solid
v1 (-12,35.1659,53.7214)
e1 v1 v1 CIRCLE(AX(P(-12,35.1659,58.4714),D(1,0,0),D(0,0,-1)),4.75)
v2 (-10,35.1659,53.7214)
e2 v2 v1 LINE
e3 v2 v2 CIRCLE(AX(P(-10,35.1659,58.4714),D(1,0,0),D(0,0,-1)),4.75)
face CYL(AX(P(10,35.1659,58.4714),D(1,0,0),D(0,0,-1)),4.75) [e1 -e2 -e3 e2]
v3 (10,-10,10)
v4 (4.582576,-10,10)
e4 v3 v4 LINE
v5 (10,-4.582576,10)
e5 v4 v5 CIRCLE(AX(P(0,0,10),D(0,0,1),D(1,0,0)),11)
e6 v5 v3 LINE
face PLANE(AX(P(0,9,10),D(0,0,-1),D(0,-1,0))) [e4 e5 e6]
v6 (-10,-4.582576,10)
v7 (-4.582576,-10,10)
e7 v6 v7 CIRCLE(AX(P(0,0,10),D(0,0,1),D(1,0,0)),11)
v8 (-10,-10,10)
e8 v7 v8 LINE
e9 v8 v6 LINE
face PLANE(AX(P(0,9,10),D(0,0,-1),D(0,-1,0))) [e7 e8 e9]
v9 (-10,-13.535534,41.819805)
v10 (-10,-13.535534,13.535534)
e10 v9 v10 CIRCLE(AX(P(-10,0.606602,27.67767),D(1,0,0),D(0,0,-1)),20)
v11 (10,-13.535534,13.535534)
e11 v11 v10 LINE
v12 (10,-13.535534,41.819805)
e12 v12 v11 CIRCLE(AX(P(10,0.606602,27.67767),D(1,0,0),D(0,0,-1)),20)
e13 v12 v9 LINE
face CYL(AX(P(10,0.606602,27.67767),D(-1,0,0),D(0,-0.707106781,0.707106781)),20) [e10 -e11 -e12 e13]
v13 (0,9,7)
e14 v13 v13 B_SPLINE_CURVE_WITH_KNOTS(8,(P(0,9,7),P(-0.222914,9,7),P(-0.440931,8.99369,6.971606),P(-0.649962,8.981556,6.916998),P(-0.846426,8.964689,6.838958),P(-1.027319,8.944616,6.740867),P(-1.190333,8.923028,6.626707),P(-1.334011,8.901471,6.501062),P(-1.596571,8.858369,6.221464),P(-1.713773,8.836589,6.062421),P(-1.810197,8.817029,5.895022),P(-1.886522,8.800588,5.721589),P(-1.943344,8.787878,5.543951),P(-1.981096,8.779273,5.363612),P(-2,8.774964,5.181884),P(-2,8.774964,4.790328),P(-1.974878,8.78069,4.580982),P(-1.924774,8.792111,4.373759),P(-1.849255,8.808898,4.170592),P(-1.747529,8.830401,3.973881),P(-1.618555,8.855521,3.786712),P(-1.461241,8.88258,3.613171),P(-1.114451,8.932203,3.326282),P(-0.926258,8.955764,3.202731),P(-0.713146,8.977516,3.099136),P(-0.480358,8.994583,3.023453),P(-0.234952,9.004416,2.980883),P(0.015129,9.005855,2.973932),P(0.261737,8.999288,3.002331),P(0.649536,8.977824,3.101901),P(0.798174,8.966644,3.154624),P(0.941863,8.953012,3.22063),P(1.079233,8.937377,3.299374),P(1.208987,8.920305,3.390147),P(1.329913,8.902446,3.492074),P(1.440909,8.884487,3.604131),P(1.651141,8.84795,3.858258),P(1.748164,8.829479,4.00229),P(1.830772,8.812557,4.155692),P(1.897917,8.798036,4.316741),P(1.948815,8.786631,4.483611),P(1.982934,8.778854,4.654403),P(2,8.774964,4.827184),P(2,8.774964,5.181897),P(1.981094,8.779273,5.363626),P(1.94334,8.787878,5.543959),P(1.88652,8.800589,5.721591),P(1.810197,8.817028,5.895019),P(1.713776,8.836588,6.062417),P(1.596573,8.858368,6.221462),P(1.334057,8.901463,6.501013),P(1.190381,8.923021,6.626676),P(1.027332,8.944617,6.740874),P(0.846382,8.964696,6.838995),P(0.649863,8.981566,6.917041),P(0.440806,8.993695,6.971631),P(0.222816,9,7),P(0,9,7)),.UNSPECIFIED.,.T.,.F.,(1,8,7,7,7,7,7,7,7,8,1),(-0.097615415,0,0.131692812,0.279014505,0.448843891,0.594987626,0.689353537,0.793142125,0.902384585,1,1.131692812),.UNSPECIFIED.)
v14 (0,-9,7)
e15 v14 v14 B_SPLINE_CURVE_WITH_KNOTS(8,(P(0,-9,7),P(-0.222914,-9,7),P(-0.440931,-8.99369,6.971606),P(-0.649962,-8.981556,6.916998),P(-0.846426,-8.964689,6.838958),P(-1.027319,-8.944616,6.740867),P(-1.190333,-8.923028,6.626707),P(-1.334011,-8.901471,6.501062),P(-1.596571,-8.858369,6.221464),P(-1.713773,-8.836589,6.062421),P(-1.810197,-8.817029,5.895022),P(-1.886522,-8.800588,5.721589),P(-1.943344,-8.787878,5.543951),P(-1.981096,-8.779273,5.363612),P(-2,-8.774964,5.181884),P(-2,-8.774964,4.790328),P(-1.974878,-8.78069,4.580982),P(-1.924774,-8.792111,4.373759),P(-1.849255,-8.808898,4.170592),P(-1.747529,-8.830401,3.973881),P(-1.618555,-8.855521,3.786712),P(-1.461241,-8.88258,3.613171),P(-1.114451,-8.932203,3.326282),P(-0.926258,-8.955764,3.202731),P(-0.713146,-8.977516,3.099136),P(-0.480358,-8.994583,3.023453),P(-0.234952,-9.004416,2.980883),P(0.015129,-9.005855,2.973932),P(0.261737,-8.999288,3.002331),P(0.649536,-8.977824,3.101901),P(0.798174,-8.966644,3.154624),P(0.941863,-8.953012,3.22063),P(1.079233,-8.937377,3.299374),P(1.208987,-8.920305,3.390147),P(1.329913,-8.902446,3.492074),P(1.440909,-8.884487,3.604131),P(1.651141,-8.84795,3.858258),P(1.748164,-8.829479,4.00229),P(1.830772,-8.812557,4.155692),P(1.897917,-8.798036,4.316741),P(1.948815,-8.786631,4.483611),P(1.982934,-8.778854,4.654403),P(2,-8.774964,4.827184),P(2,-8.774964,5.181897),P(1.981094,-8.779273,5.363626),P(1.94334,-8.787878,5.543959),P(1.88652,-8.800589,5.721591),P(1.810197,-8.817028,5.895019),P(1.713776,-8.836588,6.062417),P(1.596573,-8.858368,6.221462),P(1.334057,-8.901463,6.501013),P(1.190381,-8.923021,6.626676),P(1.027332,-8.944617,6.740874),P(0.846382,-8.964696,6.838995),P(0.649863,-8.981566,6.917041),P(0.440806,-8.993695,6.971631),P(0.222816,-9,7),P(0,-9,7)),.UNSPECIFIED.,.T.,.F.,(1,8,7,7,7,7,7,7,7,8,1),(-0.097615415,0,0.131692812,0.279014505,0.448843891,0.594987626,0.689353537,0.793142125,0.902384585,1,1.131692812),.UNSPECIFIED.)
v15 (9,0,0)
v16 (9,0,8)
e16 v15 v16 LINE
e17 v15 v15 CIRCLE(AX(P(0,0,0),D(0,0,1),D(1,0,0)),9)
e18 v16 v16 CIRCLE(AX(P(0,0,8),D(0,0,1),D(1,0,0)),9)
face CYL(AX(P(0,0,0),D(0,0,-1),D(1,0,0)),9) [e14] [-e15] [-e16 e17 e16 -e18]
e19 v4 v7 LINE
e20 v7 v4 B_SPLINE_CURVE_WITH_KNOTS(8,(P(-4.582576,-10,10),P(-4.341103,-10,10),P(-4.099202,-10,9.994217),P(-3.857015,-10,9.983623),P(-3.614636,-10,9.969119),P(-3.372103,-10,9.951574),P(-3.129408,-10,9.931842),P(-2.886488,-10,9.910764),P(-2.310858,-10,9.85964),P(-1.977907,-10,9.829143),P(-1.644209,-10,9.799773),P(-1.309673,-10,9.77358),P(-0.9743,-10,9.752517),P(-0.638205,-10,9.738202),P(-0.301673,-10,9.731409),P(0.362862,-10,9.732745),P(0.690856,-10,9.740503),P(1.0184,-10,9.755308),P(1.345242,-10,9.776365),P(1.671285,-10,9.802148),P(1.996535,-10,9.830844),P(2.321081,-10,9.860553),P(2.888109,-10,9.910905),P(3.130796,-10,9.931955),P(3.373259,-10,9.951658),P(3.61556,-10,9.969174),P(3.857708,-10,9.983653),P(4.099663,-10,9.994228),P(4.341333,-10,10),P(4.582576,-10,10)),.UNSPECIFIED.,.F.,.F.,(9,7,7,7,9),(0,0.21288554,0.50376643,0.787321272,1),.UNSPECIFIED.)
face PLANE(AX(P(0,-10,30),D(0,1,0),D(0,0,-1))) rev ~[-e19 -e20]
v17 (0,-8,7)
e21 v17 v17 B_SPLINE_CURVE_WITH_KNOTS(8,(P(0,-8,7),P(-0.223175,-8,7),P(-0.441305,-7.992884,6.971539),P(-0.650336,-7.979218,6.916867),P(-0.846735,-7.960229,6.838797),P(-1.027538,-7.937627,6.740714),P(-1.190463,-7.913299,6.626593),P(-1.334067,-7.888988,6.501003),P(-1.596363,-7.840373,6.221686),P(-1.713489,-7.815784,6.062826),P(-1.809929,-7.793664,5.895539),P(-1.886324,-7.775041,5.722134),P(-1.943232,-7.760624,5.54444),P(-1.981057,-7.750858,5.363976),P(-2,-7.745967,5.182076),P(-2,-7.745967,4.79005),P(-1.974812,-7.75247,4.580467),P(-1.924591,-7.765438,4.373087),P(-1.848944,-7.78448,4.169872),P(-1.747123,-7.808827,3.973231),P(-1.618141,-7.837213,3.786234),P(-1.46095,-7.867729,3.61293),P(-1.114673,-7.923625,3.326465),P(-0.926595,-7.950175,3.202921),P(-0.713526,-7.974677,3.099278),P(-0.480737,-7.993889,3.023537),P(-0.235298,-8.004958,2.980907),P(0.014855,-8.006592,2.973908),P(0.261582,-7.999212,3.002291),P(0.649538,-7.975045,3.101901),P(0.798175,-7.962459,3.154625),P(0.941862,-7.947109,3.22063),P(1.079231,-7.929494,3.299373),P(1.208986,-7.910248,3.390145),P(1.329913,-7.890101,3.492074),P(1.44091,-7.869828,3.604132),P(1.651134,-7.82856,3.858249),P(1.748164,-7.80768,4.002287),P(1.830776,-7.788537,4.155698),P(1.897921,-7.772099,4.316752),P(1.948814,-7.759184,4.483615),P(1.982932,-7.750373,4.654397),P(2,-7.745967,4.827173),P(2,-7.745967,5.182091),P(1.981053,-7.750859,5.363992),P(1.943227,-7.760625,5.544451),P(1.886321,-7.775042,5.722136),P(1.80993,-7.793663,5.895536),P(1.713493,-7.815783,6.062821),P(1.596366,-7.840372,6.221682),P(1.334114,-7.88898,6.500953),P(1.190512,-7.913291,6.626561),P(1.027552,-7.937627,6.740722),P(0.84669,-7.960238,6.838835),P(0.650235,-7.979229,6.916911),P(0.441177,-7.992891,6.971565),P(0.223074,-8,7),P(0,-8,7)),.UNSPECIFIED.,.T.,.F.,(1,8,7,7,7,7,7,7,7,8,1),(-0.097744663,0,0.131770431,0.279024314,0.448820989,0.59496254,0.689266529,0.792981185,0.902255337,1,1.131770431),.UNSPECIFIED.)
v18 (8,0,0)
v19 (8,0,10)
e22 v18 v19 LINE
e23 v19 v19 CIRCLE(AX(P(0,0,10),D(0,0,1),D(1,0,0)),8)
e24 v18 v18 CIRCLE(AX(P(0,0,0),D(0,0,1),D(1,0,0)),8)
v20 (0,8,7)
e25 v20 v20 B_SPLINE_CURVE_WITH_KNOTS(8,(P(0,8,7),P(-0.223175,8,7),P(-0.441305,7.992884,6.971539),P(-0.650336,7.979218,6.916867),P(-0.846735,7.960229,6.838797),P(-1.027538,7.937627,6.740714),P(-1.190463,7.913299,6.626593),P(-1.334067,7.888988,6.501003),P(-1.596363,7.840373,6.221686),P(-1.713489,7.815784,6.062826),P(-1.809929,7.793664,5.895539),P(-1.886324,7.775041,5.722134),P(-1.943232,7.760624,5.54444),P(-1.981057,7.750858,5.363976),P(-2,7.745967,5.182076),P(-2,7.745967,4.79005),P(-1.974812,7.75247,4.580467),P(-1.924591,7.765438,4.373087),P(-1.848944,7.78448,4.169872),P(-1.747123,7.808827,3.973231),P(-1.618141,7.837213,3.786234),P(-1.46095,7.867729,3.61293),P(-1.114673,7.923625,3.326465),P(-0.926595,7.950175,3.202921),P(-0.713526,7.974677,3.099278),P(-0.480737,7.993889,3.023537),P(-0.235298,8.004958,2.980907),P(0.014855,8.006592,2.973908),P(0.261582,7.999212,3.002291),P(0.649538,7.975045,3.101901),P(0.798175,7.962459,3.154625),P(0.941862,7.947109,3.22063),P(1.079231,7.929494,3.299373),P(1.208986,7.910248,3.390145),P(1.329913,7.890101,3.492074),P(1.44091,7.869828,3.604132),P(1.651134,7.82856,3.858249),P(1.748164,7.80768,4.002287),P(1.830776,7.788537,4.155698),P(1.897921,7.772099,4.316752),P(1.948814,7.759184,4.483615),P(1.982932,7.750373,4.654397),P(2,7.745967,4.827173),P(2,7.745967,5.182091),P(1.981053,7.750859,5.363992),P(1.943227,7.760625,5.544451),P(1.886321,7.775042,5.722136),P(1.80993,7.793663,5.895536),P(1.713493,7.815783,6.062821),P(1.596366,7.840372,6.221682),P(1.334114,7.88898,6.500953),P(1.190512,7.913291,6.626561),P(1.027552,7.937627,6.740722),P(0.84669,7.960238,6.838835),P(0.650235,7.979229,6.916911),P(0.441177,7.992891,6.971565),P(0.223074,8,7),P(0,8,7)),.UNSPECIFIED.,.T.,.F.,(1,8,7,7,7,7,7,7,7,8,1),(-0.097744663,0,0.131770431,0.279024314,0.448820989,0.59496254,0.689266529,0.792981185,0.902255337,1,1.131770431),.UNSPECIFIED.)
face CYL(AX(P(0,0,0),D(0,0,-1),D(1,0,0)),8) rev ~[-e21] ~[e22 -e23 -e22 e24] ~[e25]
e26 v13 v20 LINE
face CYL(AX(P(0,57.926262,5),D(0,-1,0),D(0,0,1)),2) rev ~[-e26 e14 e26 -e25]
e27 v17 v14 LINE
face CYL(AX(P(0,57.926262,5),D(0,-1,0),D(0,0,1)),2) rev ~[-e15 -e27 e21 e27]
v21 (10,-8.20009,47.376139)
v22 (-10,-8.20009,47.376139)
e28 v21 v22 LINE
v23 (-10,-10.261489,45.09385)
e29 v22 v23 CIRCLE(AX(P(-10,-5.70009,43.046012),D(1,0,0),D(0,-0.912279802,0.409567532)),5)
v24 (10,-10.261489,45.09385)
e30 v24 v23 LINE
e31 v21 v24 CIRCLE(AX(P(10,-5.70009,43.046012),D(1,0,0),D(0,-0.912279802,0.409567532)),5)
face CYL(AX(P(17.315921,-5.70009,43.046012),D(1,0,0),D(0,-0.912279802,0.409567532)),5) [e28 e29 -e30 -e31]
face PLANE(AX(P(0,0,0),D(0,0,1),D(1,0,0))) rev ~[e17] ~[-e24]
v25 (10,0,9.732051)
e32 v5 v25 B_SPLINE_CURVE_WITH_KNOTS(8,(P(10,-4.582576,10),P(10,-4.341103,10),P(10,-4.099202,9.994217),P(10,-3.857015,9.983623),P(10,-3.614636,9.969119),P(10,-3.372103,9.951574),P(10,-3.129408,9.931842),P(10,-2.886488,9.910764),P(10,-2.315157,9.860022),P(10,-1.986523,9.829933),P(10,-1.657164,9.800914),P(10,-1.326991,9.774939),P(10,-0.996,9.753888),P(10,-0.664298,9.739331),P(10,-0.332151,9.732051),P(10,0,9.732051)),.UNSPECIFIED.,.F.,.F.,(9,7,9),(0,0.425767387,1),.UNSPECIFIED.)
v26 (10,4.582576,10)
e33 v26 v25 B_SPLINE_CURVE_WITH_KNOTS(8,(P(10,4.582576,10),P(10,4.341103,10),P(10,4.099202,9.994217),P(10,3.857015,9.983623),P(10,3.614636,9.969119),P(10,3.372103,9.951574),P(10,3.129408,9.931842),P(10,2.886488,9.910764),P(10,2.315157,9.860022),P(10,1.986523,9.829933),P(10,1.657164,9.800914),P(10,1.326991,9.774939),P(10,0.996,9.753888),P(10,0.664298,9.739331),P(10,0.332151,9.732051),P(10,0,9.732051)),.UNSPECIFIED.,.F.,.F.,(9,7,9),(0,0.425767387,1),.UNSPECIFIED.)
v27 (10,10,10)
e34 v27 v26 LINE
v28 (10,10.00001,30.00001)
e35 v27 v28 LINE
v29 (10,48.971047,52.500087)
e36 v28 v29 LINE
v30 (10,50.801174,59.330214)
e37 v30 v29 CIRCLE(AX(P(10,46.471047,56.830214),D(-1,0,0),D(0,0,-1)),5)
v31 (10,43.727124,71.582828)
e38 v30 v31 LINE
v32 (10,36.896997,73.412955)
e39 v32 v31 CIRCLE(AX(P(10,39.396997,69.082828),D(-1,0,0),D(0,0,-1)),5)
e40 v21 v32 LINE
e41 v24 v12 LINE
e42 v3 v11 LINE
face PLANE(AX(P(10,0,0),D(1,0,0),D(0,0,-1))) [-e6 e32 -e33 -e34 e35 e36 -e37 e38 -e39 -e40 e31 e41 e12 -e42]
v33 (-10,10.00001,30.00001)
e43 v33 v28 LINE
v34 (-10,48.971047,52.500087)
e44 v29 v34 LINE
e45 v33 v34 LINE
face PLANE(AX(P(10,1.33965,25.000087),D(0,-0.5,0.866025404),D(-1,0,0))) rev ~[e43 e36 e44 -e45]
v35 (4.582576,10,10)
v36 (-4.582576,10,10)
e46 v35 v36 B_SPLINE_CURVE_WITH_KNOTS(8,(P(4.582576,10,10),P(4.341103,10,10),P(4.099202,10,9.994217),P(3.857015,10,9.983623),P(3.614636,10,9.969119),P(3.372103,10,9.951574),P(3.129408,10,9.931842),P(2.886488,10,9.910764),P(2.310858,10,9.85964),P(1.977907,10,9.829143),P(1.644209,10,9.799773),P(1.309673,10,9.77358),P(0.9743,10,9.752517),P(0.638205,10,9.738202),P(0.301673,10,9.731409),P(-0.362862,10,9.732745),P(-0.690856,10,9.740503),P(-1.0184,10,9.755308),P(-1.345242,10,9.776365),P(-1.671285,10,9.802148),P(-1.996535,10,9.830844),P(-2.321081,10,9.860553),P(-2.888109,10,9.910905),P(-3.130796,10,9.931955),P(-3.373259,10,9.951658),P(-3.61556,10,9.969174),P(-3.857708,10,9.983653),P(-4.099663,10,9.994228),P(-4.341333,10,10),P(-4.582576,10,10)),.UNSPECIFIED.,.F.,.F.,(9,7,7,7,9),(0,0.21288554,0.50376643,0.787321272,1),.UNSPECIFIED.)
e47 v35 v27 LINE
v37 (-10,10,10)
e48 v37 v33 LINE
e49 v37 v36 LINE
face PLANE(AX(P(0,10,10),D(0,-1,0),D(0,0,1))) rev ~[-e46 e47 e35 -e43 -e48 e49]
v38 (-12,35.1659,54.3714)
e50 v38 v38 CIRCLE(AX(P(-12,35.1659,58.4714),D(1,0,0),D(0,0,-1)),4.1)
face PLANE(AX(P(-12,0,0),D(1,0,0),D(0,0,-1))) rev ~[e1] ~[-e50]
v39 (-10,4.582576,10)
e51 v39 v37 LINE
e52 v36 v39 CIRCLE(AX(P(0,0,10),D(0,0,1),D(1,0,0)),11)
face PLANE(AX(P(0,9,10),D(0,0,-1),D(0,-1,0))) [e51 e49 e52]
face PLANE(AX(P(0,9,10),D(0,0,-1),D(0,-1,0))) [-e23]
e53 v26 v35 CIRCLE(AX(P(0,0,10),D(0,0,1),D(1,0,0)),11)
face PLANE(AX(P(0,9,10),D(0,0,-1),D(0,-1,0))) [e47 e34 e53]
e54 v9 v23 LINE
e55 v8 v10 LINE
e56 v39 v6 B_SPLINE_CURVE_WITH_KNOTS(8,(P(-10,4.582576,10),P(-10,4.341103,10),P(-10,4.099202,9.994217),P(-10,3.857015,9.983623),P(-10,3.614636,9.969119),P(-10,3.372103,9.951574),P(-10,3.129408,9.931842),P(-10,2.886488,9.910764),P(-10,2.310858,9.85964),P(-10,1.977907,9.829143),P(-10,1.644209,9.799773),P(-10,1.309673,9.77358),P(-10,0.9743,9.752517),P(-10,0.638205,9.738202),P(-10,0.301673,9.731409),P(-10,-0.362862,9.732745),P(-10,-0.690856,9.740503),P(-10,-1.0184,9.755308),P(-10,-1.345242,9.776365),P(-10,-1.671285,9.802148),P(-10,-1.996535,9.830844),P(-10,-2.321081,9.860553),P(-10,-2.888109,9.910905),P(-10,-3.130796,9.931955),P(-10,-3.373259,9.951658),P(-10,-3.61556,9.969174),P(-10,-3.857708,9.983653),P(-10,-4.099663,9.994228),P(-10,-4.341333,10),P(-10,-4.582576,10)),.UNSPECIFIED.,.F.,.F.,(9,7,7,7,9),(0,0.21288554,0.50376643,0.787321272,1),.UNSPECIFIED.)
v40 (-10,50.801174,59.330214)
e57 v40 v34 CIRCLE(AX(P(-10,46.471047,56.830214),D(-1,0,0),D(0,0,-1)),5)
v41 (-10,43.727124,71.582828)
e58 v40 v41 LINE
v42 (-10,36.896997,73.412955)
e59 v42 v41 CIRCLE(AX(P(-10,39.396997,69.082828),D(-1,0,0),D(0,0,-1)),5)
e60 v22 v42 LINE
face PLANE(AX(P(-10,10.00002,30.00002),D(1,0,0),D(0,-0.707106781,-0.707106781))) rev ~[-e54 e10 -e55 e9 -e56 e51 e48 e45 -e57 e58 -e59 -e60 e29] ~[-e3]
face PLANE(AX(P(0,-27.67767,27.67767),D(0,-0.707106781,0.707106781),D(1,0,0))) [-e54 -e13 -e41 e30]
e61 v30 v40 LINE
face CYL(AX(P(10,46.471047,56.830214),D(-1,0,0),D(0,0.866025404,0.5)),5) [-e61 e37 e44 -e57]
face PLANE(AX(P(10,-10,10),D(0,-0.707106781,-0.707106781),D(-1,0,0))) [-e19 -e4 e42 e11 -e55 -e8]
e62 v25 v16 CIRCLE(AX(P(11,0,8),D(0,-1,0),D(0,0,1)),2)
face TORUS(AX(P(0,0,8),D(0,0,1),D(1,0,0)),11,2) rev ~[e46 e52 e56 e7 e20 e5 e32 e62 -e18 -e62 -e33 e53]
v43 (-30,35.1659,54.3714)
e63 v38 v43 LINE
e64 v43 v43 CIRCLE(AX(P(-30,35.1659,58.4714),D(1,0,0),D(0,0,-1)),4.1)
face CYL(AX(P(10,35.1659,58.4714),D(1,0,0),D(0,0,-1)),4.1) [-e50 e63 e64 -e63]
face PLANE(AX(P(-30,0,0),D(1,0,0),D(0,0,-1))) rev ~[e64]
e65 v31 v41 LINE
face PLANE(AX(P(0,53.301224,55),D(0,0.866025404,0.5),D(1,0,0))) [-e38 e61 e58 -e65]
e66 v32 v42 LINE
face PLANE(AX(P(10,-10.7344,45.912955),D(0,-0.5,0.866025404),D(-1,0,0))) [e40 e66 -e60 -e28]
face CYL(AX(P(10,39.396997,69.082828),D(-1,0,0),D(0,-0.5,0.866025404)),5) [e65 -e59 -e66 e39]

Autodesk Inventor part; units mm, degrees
sketch "Esquisse1" plane through (0, 0, 0) normal (0, 0, 1) x (1, 0, 0)
  circle A0 centre (0, 0) radius 8
  circle A1 centre (0, 0) radius 9
  dimension "d0" = 16
  dimension "d1" = 18
extrude "Extrusion1" add sketch "Esquisse1" along normal blind 10
sketch "Esquisse2" plane through (0, 0, 0) normal (1, 0, 0) x (0, 1, 0)
  line L0 (9, 10) -> (-9, 10) projected
  line L1 (0, 10) -> (0, 25)
  line L2 (9, 10) -> (-9, 10)
  line L3 (0, 10) -> (10, 10)
  line L4 (10, 10) -> (10, 30)
  line L5 (10, 30) -> (-10, 30)
  line L6 (-10, 30) -> (-10, 10)
  line L7 (-10, 10) -> (0, 10)
  point P0 (0, 0)
  dimension "d26" = 10
  dimension "d27" = 20
  dimension "d28" = 20
  dimension "d29" = 90
extrude "Extrusion2" add sketch "Esquisse2" along normal mid plane 20
fillet "Congé1" radius 2 1 edges at (-9, 0, 10)
sketch "Esquisse4" plane through (0, 0, 0) normal (0, 1, 0) x (-1, 0, 0)
  line L0 (9, 0) -> (-9, 0) projected
  line L1 (9, 0) -> (0, 0)
  line L2 (0, 0) -> (0, 5)
  line L3 (0, 0) -> (5, 0) construction
  dimension "d14" = 9
  dimension "d15" = 5
  dimension "d16" = 90
hole "Perçage1" at (0, 0, 5) direction (0, -1, 0) diameter 4 end through all both
ref_plane "Plan de construction2" through (0, -8.75, 15.1554) normal (0, -0.5, 0.8660254) x (1, 0, 0)
ref_plane "Plan de construction1" through (0, 0, 0) normal (0, -0.5, 0.8660254) x (1, 0, 0)
ref_plane "Plan de construction4" through (0, -10, 10) normal (0, -0.7071068, 0.7071068) x (1, 0, 0)
ref_plane "Plan de construction3" through (0, 0, 0) normal (0, -0.7071068, 0.7071068) x (1, 0, 0)
sketch "Esquisse6" plane through (0, -10, 10) normal (0, -0.7071068, 0.7071068) x (1, 0, 0)
  line L0 (-10, 28.2843) -> (-10, 14.1421) projected
  line L1 (10, 14.1421) -> (10, 0) projected
  line L2 (-10, 28.2843) -> (10, 28.2843)
  line L3 (10, 28.2843) -> (10, 0)
  line L4 (10, 0) -> (-10, 0)
  line L5 (-10, 0) -> (-10, 28.2843)
  line L6 (-10, 28.2843) -> (10, 28.2843) projected
  line L7 (10, 14.1421) -> (10, 28.2843) projected
  line L8 (4.5826, 14.1421) -> (10, 14.1421) projected
  line L9 (-10, 14.1421) -> (-4.5826, 14.1421) projected
  line L10 (-10, 28.2843) -> (-10, 14.1421) projected
  point P0 (0, 0)
extrude "Extrusion4" add sketch "Esquisse6" along normal blind 25
fillet "Congé4" radius 20 1 edges at (0, -27.6777, 27.6777)
ref_plane "Plan de construction5" through (0, 10, 30) normal (0, 0.8660254, 0.5) x (1, 0, 0)
ref_plane "Plan de construction7" through (0, 10, 30) normal (0, -0.5, 0.8660254) x (1, 0, 0)
ref_plane "Plan de construction6" through (0, 1.3397, 25) normal (0, 0.8660254, 0.5) x (1, 0, 0)
sketch "Esquisse18" plane through (0, 1.3397, 25) normal (0, 0.8660254, 0.5) x (1, 0, 0)
  line L0 (10, -0.0001) -> (-10, -0.0001) projected
  line L1 (-10, -0.0001) -> (-10, -24.1482) projected
  line L2 (10, -24.1482) -> (-10, -24.1482) projected
  line L3 (10, -0.0001) -> (10, -24.1482) projected
  line L4 (10, -0.0001) -> (-10, -0.0001) projected
  line L5 (-10, -0.0001) -> (-10, -24.1482) projected
  line L6 (10, -24.1482) -> (-10, -24.1482) projected
  line L7 (10, -0.0001) -> (10, -24.1482) projected
  point P0 (0, 20.9808)
extrude "Extrusion14" add sketch "Esquisse18" along normal blind 60
fillet "Congé6" radius 5 1 edges at (0, -10.7344, 45.913)
sketch "Esquisse19" plane through (10, 0, 0) normal (1, 0, 0) x (0, 0, -1)
  line L0 (-30, 10) -> (-55.0001, 53.3012) projected
  line L1 (-55.0001, 53.3012) -> (-65.4564, 47.2642)
  line L2 (-47.3761, -8.2002) -> (-75.913, 41.2272) projected
  line L3 (-65.4564, 47.2642) -> (-58.4714, 35.1659)
  circle A0 centre (-58.4714, 35.1659) radius 4.1
  point P0 (0, 0)
  dimension "d76" = 12.074
  dimension "d77" = 13.97
  dimension "d78" = 8.2
extrude "Extrusion15" add sketch "Esquisse19" against normal blind 40
sketch "Esquisse20" plane through (10, 0, 0) normal (1, 0, 0) x (0, 0, -1)
  circle A0 centre (-58.4714, 35.1659) radius 4.1 projected
  circle A1 centre (-58.4714, 35.1659) radius 4.75
  point P0 (0, 0)
  dimension "d81" = 9.5
extrude "Extrusion16" add sketch "Esquisse20" against normal blind 22
fillet "Congé7" radius 5 2 edges at (0, 53.3012, 55.0001) (0, 41.2272, 75.913)
properties part number "bielle roue milieu autre"
